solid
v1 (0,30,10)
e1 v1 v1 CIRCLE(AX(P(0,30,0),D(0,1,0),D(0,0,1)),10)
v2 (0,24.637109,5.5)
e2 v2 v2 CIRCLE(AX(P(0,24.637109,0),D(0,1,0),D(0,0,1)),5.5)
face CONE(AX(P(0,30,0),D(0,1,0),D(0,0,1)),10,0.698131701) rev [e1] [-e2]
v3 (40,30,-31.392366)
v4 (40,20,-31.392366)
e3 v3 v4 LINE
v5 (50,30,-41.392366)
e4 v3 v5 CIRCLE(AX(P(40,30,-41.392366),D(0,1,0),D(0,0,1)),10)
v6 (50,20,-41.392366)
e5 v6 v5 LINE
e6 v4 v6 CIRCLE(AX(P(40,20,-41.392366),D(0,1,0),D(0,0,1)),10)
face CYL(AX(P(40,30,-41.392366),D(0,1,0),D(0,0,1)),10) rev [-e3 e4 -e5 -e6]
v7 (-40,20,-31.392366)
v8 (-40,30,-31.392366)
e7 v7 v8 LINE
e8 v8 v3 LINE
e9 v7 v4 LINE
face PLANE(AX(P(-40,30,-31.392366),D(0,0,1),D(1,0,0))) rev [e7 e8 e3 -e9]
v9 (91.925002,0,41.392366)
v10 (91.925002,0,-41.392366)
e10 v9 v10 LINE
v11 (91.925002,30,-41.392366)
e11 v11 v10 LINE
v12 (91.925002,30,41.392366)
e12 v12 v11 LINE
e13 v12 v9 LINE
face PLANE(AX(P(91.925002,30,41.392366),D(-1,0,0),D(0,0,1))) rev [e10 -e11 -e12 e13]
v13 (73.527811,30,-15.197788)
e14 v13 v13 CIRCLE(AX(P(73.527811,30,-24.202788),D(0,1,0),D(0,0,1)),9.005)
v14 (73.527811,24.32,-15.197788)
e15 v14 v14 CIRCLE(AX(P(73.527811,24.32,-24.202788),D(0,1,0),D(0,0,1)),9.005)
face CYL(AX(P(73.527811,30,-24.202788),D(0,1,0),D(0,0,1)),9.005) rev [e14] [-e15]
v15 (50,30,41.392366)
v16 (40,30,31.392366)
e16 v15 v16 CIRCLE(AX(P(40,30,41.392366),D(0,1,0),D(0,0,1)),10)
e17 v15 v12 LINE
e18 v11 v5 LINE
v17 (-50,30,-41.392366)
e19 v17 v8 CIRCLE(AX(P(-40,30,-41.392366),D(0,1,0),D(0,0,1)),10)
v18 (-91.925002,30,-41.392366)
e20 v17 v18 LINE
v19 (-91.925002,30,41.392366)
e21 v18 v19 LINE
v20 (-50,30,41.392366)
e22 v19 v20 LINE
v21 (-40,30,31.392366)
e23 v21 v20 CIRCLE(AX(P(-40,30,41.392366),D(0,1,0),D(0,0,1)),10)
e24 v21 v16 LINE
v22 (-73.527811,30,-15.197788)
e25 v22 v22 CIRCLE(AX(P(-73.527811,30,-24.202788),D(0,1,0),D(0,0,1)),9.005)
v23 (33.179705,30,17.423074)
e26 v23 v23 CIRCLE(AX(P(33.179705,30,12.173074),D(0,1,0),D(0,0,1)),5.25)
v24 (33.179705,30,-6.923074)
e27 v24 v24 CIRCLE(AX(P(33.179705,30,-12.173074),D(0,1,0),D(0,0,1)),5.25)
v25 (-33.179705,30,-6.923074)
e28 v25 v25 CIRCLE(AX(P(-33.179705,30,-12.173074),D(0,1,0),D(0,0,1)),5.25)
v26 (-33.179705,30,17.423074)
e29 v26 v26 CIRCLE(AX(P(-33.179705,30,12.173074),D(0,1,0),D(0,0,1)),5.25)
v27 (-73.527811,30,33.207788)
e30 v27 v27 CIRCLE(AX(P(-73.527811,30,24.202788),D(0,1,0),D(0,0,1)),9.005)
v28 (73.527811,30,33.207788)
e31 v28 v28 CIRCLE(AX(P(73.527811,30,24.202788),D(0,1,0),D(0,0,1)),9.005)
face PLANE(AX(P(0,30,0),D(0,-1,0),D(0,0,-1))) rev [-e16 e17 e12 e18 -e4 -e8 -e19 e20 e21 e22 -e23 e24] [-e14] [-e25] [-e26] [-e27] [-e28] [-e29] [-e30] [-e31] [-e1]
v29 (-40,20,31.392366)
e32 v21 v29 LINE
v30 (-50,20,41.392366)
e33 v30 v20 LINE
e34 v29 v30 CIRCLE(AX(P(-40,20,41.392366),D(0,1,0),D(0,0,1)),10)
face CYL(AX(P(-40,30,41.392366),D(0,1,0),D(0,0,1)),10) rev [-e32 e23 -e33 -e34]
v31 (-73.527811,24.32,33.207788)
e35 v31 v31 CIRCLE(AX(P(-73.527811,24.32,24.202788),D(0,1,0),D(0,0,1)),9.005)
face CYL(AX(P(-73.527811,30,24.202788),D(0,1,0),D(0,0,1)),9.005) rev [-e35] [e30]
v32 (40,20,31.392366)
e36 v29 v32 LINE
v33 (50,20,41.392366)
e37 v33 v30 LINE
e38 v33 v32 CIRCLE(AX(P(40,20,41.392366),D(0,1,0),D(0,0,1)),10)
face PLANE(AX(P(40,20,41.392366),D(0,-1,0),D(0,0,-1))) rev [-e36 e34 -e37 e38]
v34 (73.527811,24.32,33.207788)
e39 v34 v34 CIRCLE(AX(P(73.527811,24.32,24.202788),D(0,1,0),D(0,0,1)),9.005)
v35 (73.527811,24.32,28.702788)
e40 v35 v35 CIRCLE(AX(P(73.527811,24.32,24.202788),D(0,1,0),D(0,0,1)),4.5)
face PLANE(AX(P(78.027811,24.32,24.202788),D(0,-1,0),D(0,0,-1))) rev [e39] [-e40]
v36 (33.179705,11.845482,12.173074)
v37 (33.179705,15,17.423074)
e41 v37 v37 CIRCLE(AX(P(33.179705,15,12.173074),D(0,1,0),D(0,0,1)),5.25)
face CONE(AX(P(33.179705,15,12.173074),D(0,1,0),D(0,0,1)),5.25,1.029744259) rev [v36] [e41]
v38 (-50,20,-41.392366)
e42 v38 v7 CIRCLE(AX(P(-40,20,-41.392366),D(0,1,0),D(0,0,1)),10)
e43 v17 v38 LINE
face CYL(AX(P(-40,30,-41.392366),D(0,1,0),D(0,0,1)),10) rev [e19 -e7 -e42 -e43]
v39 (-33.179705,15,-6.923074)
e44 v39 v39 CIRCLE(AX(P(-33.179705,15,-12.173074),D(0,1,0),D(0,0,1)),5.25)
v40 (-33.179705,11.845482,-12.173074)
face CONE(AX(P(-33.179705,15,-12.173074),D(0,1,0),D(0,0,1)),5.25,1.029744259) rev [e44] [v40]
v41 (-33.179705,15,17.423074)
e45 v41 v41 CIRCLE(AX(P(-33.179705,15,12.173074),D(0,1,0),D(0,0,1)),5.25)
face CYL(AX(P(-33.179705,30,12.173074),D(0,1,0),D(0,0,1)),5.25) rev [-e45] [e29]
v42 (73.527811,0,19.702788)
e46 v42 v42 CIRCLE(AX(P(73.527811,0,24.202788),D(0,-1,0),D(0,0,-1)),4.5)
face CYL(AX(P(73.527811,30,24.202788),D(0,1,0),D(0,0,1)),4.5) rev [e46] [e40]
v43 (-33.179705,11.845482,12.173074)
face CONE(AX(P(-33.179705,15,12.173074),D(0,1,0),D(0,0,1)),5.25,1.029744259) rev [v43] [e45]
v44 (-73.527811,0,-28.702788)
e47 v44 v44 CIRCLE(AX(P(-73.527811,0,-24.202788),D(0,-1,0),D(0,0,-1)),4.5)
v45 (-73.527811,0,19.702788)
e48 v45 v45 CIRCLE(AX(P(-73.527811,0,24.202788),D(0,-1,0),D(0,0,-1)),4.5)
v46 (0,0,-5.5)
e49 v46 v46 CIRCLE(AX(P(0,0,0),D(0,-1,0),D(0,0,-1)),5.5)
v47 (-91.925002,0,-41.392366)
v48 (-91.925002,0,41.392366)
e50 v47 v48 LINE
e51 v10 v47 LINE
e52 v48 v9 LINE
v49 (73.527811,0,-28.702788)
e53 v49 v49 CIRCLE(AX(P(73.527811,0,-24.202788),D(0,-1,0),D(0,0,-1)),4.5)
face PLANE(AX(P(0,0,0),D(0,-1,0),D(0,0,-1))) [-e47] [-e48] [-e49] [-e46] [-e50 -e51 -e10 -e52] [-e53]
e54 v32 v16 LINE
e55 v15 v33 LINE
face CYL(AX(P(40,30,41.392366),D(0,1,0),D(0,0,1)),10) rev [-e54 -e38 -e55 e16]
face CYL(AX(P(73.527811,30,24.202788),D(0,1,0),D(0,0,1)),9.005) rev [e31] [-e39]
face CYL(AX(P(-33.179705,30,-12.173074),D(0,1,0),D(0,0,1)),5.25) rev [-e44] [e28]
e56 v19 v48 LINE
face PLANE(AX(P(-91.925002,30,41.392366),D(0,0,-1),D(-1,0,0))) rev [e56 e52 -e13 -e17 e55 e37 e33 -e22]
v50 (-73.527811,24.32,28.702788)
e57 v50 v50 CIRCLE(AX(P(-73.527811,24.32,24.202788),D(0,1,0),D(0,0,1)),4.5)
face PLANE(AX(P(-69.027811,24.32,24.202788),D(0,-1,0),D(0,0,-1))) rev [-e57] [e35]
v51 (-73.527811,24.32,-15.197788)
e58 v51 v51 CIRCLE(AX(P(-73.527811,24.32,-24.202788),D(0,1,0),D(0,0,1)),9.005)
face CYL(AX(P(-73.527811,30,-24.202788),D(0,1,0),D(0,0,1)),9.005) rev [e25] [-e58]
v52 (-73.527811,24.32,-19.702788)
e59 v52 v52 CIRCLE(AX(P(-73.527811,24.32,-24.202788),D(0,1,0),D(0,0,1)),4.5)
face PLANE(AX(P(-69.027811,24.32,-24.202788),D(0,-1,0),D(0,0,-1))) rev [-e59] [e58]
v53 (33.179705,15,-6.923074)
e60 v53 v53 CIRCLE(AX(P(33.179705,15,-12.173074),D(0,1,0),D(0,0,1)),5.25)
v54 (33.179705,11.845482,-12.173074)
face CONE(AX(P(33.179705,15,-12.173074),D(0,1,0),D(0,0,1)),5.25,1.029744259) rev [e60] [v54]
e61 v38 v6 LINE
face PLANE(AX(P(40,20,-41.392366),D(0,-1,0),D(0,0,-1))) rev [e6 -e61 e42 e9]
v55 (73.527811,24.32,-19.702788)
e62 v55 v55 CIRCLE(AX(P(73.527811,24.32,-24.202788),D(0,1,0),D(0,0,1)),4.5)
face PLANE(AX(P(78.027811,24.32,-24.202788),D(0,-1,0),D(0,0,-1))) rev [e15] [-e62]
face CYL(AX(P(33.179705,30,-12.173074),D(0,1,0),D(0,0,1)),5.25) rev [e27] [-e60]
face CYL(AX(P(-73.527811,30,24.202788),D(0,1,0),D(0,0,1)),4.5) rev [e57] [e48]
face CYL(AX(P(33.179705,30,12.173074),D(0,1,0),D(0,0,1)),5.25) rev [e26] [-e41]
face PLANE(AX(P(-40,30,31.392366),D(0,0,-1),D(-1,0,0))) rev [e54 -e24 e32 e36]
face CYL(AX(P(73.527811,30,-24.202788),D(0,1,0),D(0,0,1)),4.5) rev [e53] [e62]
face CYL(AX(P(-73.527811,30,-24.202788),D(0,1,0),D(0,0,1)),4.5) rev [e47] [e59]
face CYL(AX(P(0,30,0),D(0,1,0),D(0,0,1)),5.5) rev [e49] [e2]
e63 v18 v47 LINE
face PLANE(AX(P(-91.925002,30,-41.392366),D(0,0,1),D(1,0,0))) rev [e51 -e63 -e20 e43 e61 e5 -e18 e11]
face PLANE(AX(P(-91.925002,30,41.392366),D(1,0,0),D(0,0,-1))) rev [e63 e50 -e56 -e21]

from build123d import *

# Parameters (mm, degrees)
SKETCH1_W                                        = 183.850004878
SKETCH1_H                                        = 82.78473231
BOSS_EXTRUDE1_DEPTH                              = 30
CSK_FOR_M10_FLAT_HEAD_MACHINE_SCREW2_D           = 11
CSK_FOR_M10_FLAT_HEAD_MACHINE_SCREW2_CSINK_D     = 20
CSK_FOR_M10_FLAT_HEAD_MACHINE_SCREW2_CSINK_ANGLE = 80
CBORE_FOR_M8_HEX_HEAD_BOLT1_D                    = 9
CBORE_FOR_M8_HEX_HEAD_BOLT1_CBORE_D              = 18.01
CBORE_FOR_M8_HEX_HEAD_BOLT1_CBORE_DEPTH          = 5.68
MIRROR2_COPY_1_D                                 = 9
MIRROR2_COPY_1_CBORE_D                           = 18.01
MIRROR2_COPY_1_CBORE_DEPTH                       = 5.68
F_20_0MM_START                                   = 20
F_20_0MM_DOWEL_SLOT1_DEPTH                       = 10


# Read off the part's stored shape, not the designer's step: Ø20.0mm Dowel Slot1
with BuildPart() as part:
    # Sketch1 → Boss-Extrude1 (new body)
    with BuildSketch(Plane(origin=(0, 0, 0), x_dir=(1, 0, 0), z_dir=(0, 1, 0))):
        Rectangle(SKETCH1_W, SKETCH1_H)
    extrude(amount=BOSS_EXTRUDE1_DEPTH)

    # CSK for M10 Flat Head Machine Screw2 (through all)
    with Locations(Plane(origin=(0, 30, 0), x_dir=(1, 0, 0), z_dir=(0, 1, 0))):
        with Locations((0, 0)):
            CounterSinkHole(CSK_FOR_M10_FLAT_HEAD_MACHINE_SCREW2_D / 2, CSK_FOR_M10_FLAT_HEAD_MACHINE_SCREW2_CSINK_D / 2, counter_sink_angle=CSK_FOR_M10_FLAT_HEAD_MACHINE_SCREW2_CSINK_ANGLE)

    # CBORE for M8 Hex Head Bolt1 (through all)
    with Locations(Plane(origin=(-73.52781125, 30, -24.202787729), x_dir=(0, 0, 1), z_dir=(0, 1, 0))):
        with Locations((0, 0)):
            cbore_for_m8_hex_head_bolt1 = CounterBoreHole(CBORE_FOR_M8_HEX_HEAD_BOLT1_D / 2, CBORE_FOR_M8_HEX_HEAD_BOLT1_CBORE_D / 2, CBORE_FOR_M8_HEX_HEAD_BOLT1_CBORE_DEPTH)

    # Mirror1: CBORE for M8 Hex Head Bolt1 across plane
    add(cbore_for_m8_hex_head_bolt1.mirror(Plane.XY), mode=Mode.SUBTRACT)

    # Mirror2: CBORE for M8 Hex Head Bolt1 across plane
    add(cbore_for_m8_hex_head_bolt1.mirror(Plane(origin=(0, 0, 0), x_dir=(0, 0, 1), z_dir=(1, 0, 0))), mode=Mode.SUBTRACT)

    # Mirror2 copy 1 (through all)
    with Locations(Plane(origin=(73.52781125, 30, 24.202787729), x_dir=(0, 0, -1), z_dir=(0, 1, 0))):
        with Locations((0, 0)):
            CounterBoreHole(MIRROR2_COPY_1_D / 2, MIRROR2_COPY_1_CBORE_D / 2, MIRROR2_COPY_1_CBORE_DEPTH)

    # Ø20.0mm Dowel Slot1 outline → Ø20.0mm Dowel Slot1 (cut)
    with BuildSketch(Plane(origin=(0, 0, 0), x_dir=(1, 0, 0), z_dir=(0, 1, 0)).offset(F_20_0MM_START)):
        with BuildLine():
            Line((-50, -41.392366155), (50, -41.392366155))
            ThreePointArc((50, -41.392366155), (47.071067812, -34.321298343), (40, -31.392366155))
            Line((40, -31.392366155), (-40, -31.392366155))
            ThreePointArc((-40, -31.392366155), (-47.071067812, -34.321298343), (-50, -41.392366155))
        make_face()
    f_20_0mm_dowel_slot1 = extrude(amount=F_20_0MM_DOWEL_SLOT1_DEPTH, mode=Mode.SUBTRACT)

    # Mirror3: Ø20.0mm Dowel Slot1 across plane
    add(f_20_0mm_dowel_slot1.mirror(Plane.XY), mode=Mode.SUBTRACT)

    # Sketch20 → M12x1.5 Tapped Hole1 (revolve, cut)
    with BuildSketch(Plane(origin=(-33.179705033, 30, -12.1730736), x_dir=(0, 0, 1), z_dir=(1, 0, 0))):
        Polygon((0, 0), (0, 18.15451825), (5.25, 15), (5.25, 0), align=None)
    m12x1_5_tapped_hole1 = revolve(axis=Axis((-33.179705033, 36.35, -12.1730736), (0, -1, 0)), mode=Mode.SUBTRACT)

    # Mirror4: M12x1.5 Tapped Hole1 across plane
    add(m12x1_5_tapped_hole1.mirror(Plane.XY), mode=Mode.SUBTRACT)

    # Mirror5: M12x1.5 Tapped Hole1 across plane
    add(m12x1_5_tapped_hole1.mirror(Plane(origin=(0, 0, 0), x_dir=(0, 0, 1), z_dir=(1, 0, 0))), mode=Mode.SUBTRACT)

    # Mirror5 copy 1 sketch → Mirror5 copy 1 (revolve, cut)
    with BuildSketch(Plane(origin=(33.179705033, 30, 12.1730736), x_dir=(0, 0, -1), z_dir=(-1, 0, 0))):
        Polygon((0, 0), (0, 18.15451825), (5.25, 15), (5.25, 0), align=None)
    revolve(axis=Axis((33.179705033, 36.35, 12.1730736), (0, -1, 0)), mode=Mode.SUBTRACT)


solid = part.part
